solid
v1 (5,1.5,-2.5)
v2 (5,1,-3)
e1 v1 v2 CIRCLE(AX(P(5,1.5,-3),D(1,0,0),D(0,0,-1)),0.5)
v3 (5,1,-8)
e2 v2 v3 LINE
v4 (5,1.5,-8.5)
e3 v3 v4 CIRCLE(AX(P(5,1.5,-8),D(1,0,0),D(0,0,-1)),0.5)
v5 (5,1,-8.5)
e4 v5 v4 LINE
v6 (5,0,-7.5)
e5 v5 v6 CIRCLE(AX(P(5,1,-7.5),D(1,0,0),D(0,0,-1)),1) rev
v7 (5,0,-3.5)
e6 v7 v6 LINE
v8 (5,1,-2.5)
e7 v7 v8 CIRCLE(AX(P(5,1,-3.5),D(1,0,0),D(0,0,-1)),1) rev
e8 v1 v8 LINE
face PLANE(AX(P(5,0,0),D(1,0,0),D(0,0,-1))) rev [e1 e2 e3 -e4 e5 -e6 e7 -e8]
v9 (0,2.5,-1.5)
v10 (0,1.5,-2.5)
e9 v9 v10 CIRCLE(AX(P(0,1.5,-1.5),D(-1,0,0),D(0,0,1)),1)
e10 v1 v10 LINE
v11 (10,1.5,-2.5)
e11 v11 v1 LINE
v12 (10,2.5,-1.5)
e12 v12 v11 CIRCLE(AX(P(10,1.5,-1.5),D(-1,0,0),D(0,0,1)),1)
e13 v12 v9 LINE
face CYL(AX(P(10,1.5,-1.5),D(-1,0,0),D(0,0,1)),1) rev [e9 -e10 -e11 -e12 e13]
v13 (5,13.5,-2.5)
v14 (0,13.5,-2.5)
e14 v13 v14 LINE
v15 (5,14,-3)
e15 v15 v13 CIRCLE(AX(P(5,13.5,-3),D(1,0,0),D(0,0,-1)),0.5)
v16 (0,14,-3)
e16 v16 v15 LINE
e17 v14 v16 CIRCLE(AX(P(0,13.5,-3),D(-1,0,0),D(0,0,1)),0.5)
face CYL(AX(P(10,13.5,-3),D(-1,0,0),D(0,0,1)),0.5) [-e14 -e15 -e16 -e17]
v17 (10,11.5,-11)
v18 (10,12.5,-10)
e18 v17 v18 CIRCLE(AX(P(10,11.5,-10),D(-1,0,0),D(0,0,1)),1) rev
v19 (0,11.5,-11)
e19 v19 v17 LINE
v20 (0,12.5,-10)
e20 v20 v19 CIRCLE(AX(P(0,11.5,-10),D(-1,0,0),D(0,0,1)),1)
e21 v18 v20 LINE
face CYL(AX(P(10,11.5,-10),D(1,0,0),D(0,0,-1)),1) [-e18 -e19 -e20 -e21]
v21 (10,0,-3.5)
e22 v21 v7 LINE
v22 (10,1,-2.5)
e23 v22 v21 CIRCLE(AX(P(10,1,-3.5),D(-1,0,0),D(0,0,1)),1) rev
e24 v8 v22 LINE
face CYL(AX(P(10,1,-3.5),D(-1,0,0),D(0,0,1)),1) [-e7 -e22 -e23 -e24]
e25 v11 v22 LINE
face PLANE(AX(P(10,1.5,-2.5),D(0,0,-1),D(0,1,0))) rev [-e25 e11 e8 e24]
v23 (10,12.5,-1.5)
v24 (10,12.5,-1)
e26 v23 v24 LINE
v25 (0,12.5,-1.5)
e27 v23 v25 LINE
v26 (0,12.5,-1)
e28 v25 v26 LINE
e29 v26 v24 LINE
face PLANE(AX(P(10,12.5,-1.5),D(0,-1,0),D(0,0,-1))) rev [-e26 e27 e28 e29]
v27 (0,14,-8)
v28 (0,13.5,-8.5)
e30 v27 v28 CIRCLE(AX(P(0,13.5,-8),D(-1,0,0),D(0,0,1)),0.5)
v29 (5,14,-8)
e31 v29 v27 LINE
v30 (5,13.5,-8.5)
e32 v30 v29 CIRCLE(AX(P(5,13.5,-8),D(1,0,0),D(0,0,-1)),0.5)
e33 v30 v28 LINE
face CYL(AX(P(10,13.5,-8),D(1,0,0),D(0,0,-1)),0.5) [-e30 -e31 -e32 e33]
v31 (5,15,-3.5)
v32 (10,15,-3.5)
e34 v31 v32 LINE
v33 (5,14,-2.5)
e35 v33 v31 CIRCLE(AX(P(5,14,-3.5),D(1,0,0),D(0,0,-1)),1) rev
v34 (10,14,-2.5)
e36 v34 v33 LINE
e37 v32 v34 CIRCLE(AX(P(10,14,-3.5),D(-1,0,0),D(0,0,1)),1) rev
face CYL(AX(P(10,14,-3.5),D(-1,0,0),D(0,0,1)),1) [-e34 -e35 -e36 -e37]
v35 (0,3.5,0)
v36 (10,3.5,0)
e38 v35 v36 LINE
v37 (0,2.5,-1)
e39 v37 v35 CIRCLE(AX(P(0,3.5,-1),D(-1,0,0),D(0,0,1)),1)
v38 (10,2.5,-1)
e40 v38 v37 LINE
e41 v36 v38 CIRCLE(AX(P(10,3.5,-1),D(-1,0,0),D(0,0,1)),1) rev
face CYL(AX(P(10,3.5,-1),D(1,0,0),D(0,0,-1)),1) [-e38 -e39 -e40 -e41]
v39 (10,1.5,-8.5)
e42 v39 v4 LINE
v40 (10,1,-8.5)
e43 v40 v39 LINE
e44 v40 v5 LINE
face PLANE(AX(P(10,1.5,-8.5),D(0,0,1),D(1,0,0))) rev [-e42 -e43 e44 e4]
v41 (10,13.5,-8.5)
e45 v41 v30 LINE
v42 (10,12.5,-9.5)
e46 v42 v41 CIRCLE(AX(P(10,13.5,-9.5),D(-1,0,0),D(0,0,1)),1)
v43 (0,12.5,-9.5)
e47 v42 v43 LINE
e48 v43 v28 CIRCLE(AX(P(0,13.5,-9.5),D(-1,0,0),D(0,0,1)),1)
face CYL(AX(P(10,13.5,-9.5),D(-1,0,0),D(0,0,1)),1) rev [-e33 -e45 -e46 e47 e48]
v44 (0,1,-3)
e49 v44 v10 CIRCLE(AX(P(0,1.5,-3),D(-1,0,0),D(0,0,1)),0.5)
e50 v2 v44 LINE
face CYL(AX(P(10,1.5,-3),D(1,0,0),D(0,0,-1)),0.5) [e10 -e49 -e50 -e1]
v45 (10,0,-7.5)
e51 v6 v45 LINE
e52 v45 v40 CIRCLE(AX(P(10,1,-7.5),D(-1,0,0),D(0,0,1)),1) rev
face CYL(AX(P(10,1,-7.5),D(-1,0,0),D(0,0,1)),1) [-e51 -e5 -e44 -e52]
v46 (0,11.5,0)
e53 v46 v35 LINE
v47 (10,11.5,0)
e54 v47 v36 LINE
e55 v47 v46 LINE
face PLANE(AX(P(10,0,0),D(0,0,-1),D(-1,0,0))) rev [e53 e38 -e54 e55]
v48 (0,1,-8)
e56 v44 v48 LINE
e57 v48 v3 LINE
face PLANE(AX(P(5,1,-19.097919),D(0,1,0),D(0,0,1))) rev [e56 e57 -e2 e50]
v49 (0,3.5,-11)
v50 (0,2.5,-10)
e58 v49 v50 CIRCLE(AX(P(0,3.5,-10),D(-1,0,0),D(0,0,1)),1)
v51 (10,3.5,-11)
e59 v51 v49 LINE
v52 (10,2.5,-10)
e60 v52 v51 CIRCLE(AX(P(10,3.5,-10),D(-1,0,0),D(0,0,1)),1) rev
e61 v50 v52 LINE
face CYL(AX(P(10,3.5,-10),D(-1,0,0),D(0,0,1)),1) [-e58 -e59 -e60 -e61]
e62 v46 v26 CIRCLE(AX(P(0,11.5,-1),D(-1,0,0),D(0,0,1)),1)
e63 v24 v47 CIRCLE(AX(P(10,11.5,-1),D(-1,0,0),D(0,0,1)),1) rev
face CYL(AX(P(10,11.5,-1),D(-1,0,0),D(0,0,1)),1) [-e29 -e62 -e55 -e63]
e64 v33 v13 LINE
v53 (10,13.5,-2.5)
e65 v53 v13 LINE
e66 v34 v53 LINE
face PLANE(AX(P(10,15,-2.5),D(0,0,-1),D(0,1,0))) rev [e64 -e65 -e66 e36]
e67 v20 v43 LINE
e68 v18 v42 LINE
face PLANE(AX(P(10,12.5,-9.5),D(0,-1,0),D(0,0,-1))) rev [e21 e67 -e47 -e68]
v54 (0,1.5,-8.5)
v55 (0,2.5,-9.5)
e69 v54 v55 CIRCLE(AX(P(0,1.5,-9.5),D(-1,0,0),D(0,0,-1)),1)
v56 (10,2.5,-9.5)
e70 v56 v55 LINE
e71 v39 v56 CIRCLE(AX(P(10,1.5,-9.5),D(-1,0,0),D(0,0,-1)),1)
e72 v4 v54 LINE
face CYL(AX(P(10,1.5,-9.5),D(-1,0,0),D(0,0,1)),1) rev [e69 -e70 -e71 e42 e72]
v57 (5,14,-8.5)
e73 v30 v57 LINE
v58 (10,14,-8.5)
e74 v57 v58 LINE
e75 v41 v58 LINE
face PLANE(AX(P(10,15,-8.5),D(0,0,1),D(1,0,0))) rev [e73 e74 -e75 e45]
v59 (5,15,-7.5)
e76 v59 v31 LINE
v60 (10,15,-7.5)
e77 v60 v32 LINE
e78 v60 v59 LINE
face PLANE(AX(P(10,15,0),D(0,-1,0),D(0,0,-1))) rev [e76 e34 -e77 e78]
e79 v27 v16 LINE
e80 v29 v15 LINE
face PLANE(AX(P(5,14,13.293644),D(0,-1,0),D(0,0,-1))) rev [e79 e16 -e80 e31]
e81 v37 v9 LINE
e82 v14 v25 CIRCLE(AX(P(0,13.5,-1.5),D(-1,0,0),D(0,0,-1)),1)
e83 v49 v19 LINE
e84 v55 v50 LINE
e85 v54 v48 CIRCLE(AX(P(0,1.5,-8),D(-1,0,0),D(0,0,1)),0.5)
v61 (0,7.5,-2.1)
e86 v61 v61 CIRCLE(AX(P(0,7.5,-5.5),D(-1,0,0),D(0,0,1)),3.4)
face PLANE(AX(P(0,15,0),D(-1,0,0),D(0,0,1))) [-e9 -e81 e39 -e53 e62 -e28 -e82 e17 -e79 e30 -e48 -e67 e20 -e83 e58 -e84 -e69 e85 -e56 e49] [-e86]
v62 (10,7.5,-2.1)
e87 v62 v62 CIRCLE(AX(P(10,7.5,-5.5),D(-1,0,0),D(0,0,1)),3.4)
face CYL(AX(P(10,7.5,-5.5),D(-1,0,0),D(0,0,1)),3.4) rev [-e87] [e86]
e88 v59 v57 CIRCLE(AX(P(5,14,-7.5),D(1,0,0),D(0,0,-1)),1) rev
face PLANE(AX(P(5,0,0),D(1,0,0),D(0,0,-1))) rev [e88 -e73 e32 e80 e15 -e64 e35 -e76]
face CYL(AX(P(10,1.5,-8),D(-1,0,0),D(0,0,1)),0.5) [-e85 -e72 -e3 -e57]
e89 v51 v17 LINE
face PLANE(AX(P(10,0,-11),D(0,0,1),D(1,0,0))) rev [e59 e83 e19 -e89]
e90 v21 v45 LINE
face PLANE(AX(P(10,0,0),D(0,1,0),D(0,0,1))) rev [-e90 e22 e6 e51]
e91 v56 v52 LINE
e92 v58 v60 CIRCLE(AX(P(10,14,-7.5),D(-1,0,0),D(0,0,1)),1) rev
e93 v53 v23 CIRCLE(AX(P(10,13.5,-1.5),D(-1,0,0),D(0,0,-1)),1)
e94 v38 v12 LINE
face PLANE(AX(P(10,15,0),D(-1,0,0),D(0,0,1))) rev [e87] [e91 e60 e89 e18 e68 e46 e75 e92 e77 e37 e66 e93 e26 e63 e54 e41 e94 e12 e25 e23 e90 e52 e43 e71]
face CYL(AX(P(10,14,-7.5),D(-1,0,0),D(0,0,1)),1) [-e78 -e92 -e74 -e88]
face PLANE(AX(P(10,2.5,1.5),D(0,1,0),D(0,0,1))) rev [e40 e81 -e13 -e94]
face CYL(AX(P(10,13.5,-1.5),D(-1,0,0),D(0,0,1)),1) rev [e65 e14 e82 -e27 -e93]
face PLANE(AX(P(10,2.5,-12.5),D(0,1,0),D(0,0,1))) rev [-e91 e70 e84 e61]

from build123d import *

# Parameters (mm, degrees)
SKETCH1_W           = 11
SKETCH1_H           = 15
BOSS_EXTRUDE1_DEPTH = 10
SKETCH3_R           = 3.4
CUT_EXTRUDE1_DEPTH  = 22.118712082
CUT_EXTRUDE2_DEPTH  = 22.118712082
FILLET1_R           = 1
SKETCH5_W           = 30.35499422
SKETCH5_H           = 5.878934171
SKETCH5_W_2         = 28.690297522
SKETCH5_H_2         = 3.597414723
CUT_EXTRUDE3_DEPTH  = 5
FILLET2_R           = 0.5


with BuildPart() as part:
    # Sketch1 → Boss-Extrude1 (new body)
    with BuildSketch(Plane(origin=(0, 0, 0), x_dir=(0, 0, -1), z_dir=(1, 0, 0))):
        with Locations((5.5, 7.5)):
            Rectangle(SKETCH1_W, SKETCH1_H)
    extrude(amount=BOSS_EXTRUDE1_DEPTH)

    # Sketch3 → Cut-Extrude1 (cut, through all)
    with BuildSketch(Plane.ZY):
        with Locations((-5.5, 7.5)):
            Circle(SKETCH3_R)
    extrude(amount=-CUT_EXTRUDE1_DEPTH, mode=Mode.SUBTRACT)

    # Sketch4 → Cut-Extrude2 (cut, through all)
    with BuildSketch(Plane.ZY):
        with BuildLine():
            Line((-8.5, 15), (-8.5, 13.5))
            ThreePointArc((-8.5, 13.5), (-8.792893219, 12.792893219), (-9.5, 12.5))
            Line((-9.5, 12.5), (-12.5, 12.5))
            Line((-12.5, 12.5), (-12.5, 2.5))
            Line((-12.5, 2.5), (-9.5, 2.5))
            ThreePointArc((-9.5, 2.5), (-8.792893219, 2.207106781), (-8.5, 1.5))
            Line((-8.5, 1.5), (-8.5, 0))
            Line((-8.5, 0), (-16.5, 0))
            Line((-16.5, 0), (-16.5, 15))
            Line((-16.5, 15), (-8.5, 15))
        make_face()
        with BuildLine():
            Line((-2.5, 1.5), (-2.5, 0))
            Line((-2.5, 0), (6, 0))
            Line((6, 0), (6, 15))
            Line((6, 15), (-2.5, 15))
            Line((-2.5, 15), (-2.5, 13.5))
            ThreePointArc((-2.5, 13.5), (-2.207106781, 12.792893219), (-1.5, 12.5))
            Line((-1.5, 12.5), (1.5, 12.5))
            Line((1.5, 12.5), (1.5, 2.5))
            Line((1.5, 2.5), (-1.5, 2.5))
            ThreePointArc((-1.5, 2.5), (-2.207106781, 2.207106781), (-2.5, 1.5))
        make_face()
    extrude(amount=-CUT_EXTRUDE2_DEPTH, mode=Mode.SUBTRACT)

    # Fillet1
    fillet1_edges = [part.edges().sort_by_distance(p)[0] for p in [
        (5, 12.5, -11),
        (5, 2.5, -11),
        (5, 0, -8.5),
        (5, 15, -8.5),
        (5, 15, -2.5),
        (5, 2.5, 0),
        (5, 12.5, 0),
        (5, 0, -2.5),
    ]]
    fillet(fillet1_edges, radius=FILLET1_R)

    # Sketch5 → Cut-Extrude3 (cut)
    with BuildSketch(Plane.ZY):
        with Locations((-1.883853424, 16.939467085)):
            Rectangle(SKETCH5_W, SKETCH5_H)
        with Locations((-4.752769967, -0.798707361)):
            Rectangle(SKETCH5_W_2, SKETCH5_H_2)
    extrude(amount=-CUT_EXTRUDE3_DEPTH, mode=Mode.SUBTRACT)

    # Fillet2
    fillet2_edges = [part.edges().sort_by_distance(p)[0] for p in [
        (2.5, 1, -8.5),
        (2.5, 1, -2.5),
        (2.5, 14, -8.5),
        (2.5, 14, -2.5),
    ]]
    fillet(fillet2_edges, radius=FILLET2_R - 0.0001)  # a hair under: the kernel refuses the full size


solid = part.part
